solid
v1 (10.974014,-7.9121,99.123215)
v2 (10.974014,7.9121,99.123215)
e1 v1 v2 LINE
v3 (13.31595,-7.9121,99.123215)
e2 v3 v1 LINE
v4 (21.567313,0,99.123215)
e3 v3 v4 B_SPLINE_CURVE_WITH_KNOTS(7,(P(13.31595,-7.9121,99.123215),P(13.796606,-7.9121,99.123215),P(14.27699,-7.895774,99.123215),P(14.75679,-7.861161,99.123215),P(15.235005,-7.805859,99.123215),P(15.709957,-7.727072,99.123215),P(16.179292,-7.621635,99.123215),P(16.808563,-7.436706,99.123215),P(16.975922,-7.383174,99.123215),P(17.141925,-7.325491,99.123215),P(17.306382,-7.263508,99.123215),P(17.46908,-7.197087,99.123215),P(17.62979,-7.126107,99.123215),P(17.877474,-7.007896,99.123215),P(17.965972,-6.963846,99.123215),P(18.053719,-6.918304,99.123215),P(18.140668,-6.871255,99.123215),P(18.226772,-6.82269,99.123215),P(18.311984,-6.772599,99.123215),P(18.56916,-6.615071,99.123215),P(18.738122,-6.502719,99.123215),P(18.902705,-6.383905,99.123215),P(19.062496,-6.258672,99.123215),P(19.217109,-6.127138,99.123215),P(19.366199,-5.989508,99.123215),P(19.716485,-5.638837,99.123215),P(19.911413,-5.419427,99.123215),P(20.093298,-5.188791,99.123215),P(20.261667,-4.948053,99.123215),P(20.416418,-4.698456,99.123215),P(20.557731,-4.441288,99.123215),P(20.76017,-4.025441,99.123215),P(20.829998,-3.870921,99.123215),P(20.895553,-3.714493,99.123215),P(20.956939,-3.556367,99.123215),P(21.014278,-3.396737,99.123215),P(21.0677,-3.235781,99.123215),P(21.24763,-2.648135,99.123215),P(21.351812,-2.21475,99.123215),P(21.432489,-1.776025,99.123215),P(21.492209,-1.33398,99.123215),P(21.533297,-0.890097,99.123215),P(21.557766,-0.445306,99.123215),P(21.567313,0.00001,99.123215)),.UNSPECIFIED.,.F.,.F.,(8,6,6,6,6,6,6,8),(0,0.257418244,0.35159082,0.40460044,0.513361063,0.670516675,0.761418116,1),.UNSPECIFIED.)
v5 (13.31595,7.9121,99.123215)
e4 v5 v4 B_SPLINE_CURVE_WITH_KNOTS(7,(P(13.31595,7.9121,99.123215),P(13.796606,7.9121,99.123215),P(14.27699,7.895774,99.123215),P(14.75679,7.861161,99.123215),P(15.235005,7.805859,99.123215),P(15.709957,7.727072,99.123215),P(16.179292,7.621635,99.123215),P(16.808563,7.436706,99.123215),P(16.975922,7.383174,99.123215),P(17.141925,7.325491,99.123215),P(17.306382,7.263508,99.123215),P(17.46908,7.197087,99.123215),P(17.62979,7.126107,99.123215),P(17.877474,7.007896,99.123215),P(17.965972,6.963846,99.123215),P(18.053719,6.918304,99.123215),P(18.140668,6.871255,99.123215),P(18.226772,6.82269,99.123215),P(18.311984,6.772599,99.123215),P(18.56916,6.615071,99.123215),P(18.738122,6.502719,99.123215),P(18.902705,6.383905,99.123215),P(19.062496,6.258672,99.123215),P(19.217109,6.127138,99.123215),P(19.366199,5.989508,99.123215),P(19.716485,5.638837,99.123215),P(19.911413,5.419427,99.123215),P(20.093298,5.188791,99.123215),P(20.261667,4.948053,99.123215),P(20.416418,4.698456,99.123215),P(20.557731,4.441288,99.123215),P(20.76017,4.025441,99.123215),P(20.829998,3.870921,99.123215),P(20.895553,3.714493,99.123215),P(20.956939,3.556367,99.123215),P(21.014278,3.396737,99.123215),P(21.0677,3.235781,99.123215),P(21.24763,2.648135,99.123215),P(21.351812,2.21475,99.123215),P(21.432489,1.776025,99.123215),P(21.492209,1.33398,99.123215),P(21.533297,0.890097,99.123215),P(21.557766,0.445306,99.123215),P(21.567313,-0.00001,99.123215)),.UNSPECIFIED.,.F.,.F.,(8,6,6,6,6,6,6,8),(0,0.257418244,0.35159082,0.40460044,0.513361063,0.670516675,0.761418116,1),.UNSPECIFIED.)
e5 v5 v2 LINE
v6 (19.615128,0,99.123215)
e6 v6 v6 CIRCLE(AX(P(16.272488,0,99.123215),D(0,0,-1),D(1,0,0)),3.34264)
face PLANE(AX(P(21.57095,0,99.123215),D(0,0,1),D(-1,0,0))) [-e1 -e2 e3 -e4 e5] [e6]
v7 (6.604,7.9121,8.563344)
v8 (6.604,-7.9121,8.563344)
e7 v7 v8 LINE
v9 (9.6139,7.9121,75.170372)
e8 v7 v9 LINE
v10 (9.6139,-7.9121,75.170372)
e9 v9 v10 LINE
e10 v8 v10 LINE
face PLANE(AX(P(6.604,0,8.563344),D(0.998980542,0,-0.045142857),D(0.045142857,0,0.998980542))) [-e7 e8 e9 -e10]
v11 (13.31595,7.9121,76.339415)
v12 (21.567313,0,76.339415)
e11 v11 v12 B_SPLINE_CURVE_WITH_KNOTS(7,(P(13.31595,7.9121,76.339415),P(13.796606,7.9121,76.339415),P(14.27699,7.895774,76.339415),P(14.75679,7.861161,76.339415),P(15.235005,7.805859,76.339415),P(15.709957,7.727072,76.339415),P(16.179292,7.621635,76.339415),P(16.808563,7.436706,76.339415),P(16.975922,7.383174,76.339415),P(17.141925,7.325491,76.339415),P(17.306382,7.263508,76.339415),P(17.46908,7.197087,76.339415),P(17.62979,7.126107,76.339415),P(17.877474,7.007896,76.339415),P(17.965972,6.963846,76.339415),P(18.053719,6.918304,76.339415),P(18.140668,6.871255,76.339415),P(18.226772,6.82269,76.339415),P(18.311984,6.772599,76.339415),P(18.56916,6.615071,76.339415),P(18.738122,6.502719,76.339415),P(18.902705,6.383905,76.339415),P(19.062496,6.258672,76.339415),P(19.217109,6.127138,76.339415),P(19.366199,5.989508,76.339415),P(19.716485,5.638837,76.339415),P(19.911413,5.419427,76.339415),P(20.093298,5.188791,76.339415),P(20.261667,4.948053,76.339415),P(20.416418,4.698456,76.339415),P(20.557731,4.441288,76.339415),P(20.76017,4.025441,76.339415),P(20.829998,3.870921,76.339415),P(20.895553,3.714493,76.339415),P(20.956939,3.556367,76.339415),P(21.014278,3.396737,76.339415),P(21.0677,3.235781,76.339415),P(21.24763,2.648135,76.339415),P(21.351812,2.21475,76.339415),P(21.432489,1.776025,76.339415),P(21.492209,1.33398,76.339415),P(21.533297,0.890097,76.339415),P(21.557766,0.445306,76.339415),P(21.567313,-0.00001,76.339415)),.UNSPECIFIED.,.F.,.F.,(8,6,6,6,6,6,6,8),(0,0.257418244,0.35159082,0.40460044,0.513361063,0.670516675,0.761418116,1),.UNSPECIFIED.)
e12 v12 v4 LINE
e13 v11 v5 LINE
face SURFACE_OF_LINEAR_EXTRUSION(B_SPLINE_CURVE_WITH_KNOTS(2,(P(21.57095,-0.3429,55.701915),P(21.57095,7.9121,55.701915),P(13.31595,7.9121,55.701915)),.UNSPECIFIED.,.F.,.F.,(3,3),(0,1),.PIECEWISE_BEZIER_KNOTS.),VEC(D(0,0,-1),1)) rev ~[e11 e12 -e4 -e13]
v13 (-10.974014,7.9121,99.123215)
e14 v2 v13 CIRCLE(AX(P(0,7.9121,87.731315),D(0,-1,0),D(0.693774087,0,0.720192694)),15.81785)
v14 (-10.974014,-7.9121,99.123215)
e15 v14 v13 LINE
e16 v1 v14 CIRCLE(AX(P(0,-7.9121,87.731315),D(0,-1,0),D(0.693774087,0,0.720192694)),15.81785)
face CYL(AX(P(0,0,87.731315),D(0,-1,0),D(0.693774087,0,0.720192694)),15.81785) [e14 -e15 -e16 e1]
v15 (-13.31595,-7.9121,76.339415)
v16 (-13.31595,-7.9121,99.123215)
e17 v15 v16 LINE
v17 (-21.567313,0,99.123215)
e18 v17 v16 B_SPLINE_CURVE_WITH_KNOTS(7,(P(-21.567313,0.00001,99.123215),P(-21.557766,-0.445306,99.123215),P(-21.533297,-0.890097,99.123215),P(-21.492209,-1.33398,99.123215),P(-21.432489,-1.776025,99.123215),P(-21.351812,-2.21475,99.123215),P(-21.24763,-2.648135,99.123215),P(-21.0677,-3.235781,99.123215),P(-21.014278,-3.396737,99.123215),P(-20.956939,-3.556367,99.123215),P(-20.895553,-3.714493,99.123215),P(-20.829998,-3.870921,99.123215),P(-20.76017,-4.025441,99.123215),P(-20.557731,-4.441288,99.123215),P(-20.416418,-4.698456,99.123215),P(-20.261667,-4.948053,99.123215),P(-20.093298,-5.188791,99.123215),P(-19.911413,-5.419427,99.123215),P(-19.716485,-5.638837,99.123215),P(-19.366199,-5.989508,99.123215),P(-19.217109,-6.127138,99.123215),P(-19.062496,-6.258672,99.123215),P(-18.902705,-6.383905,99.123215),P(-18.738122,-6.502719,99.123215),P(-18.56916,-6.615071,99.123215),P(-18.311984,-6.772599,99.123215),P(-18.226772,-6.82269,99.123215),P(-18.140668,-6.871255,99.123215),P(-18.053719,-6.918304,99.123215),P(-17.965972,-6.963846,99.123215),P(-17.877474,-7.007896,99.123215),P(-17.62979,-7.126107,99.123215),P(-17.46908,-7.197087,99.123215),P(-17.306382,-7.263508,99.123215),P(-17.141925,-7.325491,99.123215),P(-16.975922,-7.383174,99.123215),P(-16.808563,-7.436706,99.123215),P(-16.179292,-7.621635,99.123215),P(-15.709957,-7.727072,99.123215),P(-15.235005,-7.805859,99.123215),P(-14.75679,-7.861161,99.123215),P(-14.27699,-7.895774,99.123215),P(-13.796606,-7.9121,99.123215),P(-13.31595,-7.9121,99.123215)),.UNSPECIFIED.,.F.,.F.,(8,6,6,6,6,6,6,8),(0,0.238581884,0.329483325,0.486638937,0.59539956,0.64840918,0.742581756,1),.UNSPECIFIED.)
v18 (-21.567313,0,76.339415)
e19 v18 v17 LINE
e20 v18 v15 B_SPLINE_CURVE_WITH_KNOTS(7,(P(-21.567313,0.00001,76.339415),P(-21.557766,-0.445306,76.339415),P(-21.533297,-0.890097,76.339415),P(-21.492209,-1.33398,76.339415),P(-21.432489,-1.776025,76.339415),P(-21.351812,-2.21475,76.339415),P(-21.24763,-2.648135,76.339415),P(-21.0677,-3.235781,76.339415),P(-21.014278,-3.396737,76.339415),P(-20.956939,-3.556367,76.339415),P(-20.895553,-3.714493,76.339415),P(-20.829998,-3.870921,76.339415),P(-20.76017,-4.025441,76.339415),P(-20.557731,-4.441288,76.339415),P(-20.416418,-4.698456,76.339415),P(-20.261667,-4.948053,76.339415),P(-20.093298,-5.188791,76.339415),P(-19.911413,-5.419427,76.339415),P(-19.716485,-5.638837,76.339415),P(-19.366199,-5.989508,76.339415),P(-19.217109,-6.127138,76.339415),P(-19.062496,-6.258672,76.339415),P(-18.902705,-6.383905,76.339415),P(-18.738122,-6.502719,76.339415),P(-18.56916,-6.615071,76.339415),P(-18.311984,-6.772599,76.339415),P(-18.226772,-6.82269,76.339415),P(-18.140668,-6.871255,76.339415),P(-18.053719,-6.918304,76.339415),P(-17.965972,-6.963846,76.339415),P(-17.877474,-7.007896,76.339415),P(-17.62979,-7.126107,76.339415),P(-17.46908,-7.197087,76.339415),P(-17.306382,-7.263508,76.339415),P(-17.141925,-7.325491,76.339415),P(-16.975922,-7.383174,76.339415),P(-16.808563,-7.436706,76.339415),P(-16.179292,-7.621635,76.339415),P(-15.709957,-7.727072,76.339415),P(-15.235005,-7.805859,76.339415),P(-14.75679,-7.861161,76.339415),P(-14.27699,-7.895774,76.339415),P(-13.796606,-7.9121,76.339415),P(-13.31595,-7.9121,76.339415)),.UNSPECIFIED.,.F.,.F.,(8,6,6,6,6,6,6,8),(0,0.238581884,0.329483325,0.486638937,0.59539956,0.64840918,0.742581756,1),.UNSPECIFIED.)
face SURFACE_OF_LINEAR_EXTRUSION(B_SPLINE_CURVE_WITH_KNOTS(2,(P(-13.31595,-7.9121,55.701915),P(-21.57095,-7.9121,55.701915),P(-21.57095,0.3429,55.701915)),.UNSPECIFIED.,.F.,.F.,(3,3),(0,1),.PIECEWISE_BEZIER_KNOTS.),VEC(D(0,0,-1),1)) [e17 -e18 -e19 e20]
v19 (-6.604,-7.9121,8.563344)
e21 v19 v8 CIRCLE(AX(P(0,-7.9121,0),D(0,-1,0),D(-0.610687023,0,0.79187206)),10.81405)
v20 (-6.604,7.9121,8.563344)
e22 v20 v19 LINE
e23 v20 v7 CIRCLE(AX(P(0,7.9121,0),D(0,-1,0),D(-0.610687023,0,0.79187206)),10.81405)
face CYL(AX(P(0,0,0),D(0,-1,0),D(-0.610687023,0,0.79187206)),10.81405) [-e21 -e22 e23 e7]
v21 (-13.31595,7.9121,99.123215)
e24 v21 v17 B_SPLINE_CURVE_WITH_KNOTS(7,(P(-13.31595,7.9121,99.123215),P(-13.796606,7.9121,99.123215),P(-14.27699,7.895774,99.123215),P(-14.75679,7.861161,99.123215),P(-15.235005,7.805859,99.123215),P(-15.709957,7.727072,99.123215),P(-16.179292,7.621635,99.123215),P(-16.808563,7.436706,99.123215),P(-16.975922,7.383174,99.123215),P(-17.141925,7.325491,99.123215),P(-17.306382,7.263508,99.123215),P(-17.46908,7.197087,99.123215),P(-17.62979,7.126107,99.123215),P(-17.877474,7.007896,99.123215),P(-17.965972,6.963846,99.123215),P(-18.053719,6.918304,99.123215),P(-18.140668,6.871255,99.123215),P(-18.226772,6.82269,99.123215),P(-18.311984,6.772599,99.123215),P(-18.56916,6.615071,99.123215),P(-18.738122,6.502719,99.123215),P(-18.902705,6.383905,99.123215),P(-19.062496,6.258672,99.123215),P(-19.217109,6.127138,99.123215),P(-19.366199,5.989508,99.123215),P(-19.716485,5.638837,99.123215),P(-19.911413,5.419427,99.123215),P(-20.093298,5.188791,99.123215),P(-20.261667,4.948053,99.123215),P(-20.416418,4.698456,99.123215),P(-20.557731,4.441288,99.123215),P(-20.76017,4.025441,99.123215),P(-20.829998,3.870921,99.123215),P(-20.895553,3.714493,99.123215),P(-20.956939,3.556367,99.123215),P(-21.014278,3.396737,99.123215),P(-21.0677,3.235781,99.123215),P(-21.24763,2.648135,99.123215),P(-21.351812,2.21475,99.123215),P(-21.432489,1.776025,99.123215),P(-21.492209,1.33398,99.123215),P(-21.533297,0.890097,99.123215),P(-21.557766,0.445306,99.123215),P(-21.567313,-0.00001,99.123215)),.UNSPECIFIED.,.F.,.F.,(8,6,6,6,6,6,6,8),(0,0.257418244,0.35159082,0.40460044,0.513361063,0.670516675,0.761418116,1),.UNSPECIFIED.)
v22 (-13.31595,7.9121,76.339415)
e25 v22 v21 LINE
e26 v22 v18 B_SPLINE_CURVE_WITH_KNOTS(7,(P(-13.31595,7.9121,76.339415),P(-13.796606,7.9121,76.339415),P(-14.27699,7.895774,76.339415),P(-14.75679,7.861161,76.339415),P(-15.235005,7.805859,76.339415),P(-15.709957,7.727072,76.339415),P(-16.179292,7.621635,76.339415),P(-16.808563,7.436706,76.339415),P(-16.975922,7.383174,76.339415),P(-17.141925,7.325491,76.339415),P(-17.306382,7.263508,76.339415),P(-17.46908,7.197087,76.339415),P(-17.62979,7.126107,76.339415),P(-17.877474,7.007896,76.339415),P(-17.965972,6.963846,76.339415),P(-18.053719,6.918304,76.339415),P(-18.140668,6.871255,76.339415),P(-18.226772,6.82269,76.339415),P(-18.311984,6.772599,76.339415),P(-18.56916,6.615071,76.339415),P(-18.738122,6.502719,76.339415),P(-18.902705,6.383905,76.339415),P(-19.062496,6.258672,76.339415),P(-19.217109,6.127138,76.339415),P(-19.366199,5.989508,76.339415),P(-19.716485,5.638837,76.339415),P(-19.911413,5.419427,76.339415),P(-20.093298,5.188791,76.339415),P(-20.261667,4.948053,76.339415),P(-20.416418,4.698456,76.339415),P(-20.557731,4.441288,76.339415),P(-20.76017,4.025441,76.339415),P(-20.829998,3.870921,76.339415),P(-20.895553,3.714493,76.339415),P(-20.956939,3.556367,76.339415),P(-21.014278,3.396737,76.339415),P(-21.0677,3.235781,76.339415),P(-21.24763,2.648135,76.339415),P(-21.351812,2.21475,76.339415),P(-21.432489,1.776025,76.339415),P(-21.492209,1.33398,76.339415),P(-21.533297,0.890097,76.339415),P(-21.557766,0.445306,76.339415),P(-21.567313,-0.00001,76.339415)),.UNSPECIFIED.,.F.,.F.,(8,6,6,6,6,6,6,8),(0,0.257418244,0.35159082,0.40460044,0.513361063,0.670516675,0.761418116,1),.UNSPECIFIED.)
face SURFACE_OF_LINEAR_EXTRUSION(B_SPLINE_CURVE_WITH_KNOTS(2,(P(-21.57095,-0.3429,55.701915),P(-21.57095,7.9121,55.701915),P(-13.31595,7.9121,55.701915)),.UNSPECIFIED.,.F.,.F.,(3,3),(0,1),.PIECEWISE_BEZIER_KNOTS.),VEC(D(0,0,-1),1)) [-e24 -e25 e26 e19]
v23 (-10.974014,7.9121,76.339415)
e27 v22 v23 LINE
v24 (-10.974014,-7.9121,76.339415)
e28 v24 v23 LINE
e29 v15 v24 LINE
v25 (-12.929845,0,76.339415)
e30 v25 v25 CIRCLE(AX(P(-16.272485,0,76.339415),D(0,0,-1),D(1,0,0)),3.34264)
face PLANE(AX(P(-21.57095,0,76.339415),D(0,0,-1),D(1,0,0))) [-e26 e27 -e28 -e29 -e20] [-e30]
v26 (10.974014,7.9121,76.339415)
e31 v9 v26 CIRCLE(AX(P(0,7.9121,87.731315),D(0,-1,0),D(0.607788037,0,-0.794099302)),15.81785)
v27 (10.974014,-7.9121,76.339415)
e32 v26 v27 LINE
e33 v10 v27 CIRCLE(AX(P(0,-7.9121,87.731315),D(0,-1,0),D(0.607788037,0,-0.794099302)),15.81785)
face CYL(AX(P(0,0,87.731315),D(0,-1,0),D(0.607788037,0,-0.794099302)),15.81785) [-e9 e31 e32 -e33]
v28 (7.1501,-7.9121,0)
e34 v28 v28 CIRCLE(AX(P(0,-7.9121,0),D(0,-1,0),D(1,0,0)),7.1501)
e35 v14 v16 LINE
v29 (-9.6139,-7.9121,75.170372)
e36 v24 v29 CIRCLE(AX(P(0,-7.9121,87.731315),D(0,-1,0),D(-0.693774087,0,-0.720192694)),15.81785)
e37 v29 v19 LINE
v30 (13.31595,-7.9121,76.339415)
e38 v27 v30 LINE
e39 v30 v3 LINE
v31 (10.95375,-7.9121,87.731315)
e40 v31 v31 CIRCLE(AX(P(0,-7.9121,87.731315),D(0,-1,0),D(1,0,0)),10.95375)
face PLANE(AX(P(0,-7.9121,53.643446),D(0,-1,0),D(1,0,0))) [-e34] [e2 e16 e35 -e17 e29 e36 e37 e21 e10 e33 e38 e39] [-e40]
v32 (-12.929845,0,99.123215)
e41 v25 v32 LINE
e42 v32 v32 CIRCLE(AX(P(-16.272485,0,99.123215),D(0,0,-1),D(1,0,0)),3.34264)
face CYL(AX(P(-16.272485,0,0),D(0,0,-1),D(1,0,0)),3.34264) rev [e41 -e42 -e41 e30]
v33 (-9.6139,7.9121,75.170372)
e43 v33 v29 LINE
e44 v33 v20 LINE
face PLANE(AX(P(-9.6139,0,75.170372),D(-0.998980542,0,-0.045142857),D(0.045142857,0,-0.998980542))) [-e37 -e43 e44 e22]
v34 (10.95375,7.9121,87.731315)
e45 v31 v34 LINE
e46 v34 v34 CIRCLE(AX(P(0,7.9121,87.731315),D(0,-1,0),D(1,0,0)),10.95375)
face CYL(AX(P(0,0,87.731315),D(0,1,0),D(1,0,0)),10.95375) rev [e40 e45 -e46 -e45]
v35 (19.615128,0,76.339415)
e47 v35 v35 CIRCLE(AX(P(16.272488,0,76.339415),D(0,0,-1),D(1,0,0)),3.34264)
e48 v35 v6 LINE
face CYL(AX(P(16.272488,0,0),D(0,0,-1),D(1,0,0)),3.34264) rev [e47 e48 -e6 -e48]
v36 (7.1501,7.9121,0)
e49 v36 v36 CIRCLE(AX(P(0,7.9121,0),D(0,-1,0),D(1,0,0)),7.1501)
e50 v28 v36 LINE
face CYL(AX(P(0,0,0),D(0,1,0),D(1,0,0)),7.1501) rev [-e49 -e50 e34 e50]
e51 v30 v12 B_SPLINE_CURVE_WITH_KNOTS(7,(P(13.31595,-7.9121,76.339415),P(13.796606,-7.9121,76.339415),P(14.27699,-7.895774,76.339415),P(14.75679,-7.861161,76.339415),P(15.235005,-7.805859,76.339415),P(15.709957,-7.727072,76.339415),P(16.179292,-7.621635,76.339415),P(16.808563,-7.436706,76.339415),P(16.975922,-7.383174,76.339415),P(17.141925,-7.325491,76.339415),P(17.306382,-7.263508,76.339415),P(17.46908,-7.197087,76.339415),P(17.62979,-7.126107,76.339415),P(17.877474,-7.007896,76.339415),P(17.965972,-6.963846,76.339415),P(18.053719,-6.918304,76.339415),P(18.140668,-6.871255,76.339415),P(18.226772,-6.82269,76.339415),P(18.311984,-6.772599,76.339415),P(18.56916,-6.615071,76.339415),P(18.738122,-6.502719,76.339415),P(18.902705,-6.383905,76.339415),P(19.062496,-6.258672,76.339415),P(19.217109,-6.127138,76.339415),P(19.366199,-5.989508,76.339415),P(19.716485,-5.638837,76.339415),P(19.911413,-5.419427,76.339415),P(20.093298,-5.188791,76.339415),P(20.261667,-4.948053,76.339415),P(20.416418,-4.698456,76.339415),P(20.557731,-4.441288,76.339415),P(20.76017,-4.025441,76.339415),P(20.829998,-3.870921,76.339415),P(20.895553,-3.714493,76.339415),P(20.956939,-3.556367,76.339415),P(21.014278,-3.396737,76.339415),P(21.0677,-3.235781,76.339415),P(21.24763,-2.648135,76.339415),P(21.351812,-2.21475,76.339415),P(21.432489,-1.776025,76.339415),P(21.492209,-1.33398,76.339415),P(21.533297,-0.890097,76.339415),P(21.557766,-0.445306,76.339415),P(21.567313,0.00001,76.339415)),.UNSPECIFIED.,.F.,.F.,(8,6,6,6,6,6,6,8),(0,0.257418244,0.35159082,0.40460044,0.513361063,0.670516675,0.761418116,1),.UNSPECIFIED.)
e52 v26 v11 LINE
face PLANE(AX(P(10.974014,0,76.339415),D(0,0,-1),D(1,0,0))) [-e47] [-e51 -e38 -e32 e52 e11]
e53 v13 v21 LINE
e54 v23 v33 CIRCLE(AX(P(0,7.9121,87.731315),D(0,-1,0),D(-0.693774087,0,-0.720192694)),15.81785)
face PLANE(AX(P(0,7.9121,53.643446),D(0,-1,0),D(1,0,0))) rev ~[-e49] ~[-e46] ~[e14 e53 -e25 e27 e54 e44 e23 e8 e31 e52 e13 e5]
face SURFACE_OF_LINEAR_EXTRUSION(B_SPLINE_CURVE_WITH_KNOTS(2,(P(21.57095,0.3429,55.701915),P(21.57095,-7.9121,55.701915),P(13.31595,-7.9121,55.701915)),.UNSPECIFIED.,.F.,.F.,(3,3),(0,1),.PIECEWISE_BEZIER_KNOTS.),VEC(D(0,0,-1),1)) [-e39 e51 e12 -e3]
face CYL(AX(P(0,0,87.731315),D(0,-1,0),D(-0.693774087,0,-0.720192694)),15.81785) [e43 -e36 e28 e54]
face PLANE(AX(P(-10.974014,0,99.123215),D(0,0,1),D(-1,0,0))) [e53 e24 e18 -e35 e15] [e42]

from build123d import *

# Parameters (mm, degrees)
F0_R        = 7.1501
F0_R_2      = 10.95375
F1_DEPTH    = 7.9121
F2_T1_DEPTH = 64.0588
F3_R        = 3.34264
F4_DEPTH    = 103.5501653159


# Not quite as in the source:
# - a fillet or chamfer that OpenCascade refuses, or shapes differently, is made with other operations: its cross-section is extruded or revolved along the edge and cut away or added
# - a feature names something its author has since deleted; it is built from what else it names


with BuildPart() as f1:
    # F0 (on Front) → F1 (new body, symmetric)
    with BuildSketch(Plane.XZ):
        with BuildLine():
            ThreePointArc((-10.9740144438, 76.3394153159), (-10.3105393191, 75.7356011824), (-9.6139, 75.1703716645))
            Line((-9.6139, 75.1703716645), (-6.604, 8.5633440549))
            ThreePointArc((-6.604, 8.5633440549), (0, -10.81405), (6.604, 8.5633440549))
            Line((6.604, 8.5633440549), (9.6139, 75.1703716645))
            ThreePointArc((9.6139, 75.1703716645), (10.3105393191, 75.7356011824), (10.9740144438, 76.3394153159))
            Line((10.9740144438, 76.3394153159), (21.57095, 76.3394153159))
            Line((21.57095, 76.3394153159), (21.57095, 99.1232153159))
            Line((21.57095, 99.1232153159), (10.9740144438, 99.1232153159))
            ThreePointArc((10.9740144438, 99.1232153159), (0, 103.5491653159), (-10.9740144438, 99.1232153159))
            Line((-10.9740144438, 99.1232153159), (-21.57095, 99.1232153159))
            Line((-21.57095, 99.1232153159), (-21.57095, 76.3394153159))
            Line((-21.57095, 76.3394153159), (-10.9740144438, 76.3394153159))
        make_face()
        Circle(F0_R, mode=Mode.SUBTRACT)
        with Locations((0, 87.7313153159)):
            Circle(F0_R_2, mode=Mode.SUBTRACT)
    extrude(amount=F1_DEPTH, both=True)

    # F2: fillet of radius 8.255 on 4 edges, made by hand

    # F2_s2 → F2_t1 (cut)
    with BuildSketch(Plane.XY.offset(55.7019153159)):
        with BuildLine():
            add(Edge.make_bspline(
                [(-13.31595, -7.9121), (-21.57095, -7.9121), (-21.57095, 0.3429)],
                knots=[0, 0, 0, 1, 1, 1], degree=2, weights=[1, 1, 1]))
            Line((-21.57095, 0.3429), (-21.57095, -7.9121))
            Line((-21.57095, -7.9121), (-13.31595, -7.9121))
        make_face()
        with BuildLine():
            add(Edge.make_bspline(
                [(-21.57095, -0.3429), (-21.57095, 7.9121), (-13.31595, 7.9121)],
                knots=[0, 0, 0, 1, 1, 1], degree=2, weights=[1, 1, 1]))
            Line((-13.31595, 7.9121), (-21.57095, 7.9121))
            Line((-21.57095, 7.9121), (-21.57095, -0.3429))
        make_face()
        with BuildLine():
            add(Edge.make_bspline(
                [(21.57095, 0.3429), (21.57095, -7.9121), (13.31595, -7.9121)],
                knots=[0, 0, 0, 1, 1, 1], degree=2, weights=[1, 1, 1]))
            Line((13.31595, -7.9121), (21.57095, -7.9121))
            Line((21.57095, -7.9121), (21.57095, 0.3429))
        make_face()
        with BuildLine():
            add(Edge.make_bspline(
                [(21.57095, -0.3429), (21.57095, 7.9121), (13.31595, 7.9121)],
                knots=[0, 0, 0, 1, 1, 1], degree=2, weights=[1, 1, 1]))
            Line((13.31595, 7.9121), (21.57095, 7.9121))
            Line((21.57095, 7.9121), (21.57095, -0.3429))
        make_face()
    extrude(amount=F2_T1_DEPTH, mode=Mode.SUBTRACT)

    # F3 (on Top) → F4 (cut, through all)
    with BuildSketch(Plane.XY):
        with Locations((-16.2724846, 0)):
            Circle(F3_R)
        with Locations((16.2724877468, 0)):
            Circle(F3_R)
    extrude(amount=F4_DEPTH, mode=Mode.SUBTRACT)


solid = f1.part
